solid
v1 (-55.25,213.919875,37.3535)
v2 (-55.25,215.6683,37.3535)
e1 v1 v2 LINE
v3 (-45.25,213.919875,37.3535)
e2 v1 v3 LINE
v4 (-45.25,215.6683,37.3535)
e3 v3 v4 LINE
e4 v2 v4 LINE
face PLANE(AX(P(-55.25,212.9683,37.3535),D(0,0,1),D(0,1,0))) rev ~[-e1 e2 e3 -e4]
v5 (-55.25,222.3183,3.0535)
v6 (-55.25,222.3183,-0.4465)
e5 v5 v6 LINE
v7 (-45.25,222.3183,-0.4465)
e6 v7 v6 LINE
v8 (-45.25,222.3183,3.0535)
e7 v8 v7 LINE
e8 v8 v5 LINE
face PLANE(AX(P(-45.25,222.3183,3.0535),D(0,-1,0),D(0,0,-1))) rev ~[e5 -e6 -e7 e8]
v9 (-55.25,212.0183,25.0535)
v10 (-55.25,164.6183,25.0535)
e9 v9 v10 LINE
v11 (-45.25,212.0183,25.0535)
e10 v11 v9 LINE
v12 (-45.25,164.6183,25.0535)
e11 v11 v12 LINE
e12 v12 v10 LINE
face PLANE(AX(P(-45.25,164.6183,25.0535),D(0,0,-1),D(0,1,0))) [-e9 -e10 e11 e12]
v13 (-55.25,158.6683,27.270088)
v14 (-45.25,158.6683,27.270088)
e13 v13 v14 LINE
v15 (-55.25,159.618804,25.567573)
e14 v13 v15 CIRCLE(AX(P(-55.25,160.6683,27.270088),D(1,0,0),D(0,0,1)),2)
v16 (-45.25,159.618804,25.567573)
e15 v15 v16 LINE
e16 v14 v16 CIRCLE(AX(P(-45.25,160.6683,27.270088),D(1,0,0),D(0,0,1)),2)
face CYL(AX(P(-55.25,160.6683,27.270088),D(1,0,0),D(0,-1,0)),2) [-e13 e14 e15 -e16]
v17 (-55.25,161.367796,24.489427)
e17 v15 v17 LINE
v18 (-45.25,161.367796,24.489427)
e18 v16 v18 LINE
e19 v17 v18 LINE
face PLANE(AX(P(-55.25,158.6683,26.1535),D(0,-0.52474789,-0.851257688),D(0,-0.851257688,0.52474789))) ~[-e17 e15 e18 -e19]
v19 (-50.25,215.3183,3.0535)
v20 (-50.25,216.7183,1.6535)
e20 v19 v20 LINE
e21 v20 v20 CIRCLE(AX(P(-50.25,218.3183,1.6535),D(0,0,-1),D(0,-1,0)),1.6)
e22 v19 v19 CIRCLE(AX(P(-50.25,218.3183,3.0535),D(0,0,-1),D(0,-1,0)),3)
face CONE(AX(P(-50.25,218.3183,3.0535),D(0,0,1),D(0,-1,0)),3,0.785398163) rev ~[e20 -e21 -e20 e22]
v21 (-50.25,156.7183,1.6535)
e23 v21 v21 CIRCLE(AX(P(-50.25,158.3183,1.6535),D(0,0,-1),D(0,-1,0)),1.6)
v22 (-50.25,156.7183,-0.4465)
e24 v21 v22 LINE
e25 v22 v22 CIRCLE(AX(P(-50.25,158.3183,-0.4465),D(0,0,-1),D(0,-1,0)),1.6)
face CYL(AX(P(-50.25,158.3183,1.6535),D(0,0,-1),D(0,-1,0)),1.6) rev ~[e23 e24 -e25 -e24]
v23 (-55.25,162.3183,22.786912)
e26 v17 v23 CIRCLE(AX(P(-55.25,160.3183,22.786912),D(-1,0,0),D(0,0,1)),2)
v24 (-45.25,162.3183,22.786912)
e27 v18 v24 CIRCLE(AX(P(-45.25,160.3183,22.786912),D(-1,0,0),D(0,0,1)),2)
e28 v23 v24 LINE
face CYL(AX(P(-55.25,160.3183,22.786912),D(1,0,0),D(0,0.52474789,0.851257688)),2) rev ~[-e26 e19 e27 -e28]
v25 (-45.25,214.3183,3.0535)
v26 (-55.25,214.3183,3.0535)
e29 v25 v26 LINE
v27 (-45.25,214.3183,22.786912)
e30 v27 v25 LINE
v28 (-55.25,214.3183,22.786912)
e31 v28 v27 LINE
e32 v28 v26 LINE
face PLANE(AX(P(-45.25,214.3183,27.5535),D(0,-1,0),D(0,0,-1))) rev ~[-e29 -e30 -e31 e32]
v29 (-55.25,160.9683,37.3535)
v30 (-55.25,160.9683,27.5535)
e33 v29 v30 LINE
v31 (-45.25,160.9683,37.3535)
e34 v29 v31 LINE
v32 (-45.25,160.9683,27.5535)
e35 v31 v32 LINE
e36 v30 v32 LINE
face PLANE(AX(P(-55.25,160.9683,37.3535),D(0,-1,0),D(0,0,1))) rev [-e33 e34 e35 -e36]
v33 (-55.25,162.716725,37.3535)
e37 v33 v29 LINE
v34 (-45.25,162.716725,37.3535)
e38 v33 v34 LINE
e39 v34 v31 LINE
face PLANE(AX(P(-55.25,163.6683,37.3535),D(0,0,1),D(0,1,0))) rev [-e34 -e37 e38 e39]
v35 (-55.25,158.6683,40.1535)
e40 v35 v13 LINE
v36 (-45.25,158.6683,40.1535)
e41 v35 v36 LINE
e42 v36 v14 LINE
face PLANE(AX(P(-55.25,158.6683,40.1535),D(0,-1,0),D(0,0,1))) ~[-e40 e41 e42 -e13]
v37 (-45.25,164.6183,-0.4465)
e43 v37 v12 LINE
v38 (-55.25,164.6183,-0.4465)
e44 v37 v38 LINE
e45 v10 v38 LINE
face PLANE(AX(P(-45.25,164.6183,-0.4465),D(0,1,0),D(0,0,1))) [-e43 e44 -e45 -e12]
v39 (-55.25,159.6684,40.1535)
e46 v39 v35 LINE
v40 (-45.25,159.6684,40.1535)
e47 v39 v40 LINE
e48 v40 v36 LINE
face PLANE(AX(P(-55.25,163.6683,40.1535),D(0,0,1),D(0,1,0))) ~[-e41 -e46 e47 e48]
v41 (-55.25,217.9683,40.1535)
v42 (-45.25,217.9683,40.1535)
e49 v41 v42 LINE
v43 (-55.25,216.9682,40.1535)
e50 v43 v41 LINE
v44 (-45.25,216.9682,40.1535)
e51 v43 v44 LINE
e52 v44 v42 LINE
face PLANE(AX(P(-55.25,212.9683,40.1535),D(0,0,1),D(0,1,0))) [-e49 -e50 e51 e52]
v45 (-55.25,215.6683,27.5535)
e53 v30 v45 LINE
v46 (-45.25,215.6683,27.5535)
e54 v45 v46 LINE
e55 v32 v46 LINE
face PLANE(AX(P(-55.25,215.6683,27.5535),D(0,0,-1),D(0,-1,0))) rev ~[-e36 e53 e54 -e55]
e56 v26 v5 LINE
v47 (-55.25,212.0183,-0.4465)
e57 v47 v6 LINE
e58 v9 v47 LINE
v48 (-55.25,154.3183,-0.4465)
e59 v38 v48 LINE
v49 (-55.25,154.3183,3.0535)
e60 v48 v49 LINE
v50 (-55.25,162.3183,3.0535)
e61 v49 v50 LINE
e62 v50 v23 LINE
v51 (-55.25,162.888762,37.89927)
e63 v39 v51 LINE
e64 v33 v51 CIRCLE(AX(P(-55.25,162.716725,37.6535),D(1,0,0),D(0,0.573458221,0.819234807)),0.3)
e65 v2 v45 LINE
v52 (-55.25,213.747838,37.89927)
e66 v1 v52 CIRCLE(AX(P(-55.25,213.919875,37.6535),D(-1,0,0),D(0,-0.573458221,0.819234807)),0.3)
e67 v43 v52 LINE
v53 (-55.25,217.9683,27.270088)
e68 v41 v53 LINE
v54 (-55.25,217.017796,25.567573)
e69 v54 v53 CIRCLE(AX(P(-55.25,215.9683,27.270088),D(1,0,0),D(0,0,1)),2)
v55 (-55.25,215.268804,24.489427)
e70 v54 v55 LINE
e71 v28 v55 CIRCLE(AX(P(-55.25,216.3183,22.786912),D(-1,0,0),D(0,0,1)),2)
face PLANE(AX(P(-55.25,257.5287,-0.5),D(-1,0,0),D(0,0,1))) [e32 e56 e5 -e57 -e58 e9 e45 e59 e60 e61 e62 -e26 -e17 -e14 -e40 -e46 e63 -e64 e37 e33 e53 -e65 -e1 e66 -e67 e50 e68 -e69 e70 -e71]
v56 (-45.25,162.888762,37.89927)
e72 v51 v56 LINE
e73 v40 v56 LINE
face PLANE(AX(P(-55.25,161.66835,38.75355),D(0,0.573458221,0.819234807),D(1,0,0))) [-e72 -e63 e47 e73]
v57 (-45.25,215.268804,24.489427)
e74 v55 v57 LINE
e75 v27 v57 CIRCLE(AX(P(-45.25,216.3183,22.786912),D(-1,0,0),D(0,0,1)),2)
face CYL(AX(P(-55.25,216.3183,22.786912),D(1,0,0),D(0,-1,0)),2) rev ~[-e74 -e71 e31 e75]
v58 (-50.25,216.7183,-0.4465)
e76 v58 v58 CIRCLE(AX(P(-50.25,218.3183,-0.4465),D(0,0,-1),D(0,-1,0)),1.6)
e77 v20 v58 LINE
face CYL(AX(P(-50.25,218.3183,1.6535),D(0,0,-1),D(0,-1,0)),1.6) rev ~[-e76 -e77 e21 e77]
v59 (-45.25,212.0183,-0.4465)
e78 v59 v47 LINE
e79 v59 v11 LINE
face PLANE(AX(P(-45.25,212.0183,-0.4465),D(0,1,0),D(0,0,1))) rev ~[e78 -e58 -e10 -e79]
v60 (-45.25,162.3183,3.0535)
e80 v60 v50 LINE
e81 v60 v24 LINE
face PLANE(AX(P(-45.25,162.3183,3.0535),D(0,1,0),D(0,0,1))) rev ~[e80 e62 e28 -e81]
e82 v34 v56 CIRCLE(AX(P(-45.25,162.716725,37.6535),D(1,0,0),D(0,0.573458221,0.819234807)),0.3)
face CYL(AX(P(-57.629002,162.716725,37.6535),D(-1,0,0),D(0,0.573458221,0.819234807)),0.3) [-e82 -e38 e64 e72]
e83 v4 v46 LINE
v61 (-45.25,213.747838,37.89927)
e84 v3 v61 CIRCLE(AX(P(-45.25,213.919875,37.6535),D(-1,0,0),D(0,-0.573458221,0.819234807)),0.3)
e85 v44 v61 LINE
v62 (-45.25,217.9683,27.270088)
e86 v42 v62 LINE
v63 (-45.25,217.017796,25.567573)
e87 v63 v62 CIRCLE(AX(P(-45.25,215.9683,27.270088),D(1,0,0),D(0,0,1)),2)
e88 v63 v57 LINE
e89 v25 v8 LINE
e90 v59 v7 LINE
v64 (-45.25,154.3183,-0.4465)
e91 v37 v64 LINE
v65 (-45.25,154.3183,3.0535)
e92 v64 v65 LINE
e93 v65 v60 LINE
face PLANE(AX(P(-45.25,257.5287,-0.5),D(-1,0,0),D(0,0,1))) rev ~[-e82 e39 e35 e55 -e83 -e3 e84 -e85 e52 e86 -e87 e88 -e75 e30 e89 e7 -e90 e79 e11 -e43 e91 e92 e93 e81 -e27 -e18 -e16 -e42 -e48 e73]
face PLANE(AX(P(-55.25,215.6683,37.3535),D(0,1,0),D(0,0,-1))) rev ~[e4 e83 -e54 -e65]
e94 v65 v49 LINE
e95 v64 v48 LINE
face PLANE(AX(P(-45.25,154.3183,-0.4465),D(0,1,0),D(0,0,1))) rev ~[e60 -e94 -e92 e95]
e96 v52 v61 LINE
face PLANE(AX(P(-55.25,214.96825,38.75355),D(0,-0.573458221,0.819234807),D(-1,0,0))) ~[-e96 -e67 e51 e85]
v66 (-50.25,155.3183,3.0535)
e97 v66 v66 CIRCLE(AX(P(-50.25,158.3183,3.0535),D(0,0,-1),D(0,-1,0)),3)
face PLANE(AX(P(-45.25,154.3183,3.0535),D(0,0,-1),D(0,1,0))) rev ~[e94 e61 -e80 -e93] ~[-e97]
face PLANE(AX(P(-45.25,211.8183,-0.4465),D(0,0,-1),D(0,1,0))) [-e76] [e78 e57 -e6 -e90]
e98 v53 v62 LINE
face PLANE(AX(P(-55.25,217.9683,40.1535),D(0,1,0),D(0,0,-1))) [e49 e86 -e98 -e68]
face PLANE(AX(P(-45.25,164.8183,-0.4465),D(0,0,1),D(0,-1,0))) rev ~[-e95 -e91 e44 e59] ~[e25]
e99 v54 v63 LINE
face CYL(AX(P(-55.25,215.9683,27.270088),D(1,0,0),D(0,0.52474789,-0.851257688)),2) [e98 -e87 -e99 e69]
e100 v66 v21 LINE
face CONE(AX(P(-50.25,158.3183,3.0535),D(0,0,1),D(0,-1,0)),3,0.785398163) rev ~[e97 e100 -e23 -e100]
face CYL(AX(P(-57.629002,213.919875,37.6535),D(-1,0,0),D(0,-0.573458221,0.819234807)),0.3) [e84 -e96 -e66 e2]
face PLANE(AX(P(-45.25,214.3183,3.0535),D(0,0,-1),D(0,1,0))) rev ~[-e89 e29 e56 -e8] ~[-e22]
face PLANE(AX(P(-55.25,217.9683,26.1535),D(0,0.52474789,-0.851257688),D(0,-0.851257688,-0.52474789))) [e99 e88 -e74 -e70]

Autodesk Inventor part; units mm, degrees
ref_plane "YZ Plane" through (0, 0, 0) normal (1, 0, 0) x (0, 1, 0)
ref_plane "XZ Plane" through (0, 0, 0) normal (0, 1, 0) x (-1, 0, 0)
ref_plane "Work Plane4" through (-45.25, 257.5287, -0.5) normal (1, 0, 0) x (0, -1, 0)
sketch "Sketch5" plane through (-45.25, 257.5287, -0.5) normal (1, 0, 0) x (0, -1, 0)
  line L0 (45.7104, -25.5535) -> (92.7104, -25.5535)
  line L1 (92.7104, -25.5535) -> (92.7104, -0.0535)
  line L2 (45.7104, -0.0535) -> (45.7104, -25.5535)
  line L3 (95.2104, -28.0535) -> (43.2104, -28.0535)
  line L4 (43.2104, -28.0535) -> (43.2104, -3.5535)
  line L5 (103.2104, -0.0535) -> (103.2104, -3.5535)
  line L6 (103.2104, -3.5535) -> (95.2104, -3.5535)
  line L7 (92.7104, -0.0535) -> (103.2104, -0.0535)
  line L8 (95.2104, -3.5535) -> (95.2104, -28.0535)
  line L9 (43.2104, -3.5535) -> (35.2104, -3.5535)
  line L10 (35.2104, -3.5535) -> (35.2104, -0.0535)
  line L11 (45.7104, -0.0535) -> (35.2104, -0.0535)
  point P0 (257.5287, -0.5)
  dimension "d10" = 2.5
  dimension "d11" = 3.5
  dimension "d12" = 2.5
  dimension "d13" = 8
  dimension "d14" = 2.5
  dimension "d17" = 8
  dimension "d40" = 47
  dimension "d41" = 25.5
extrude "Extrusion2" add sketch "Sketch5" against normal blind 10
sketch "Sketch6" plane through (-45.25, 154.3183, 3.0535) normal (0, 0, 1) x (1, 0, 0)
  line L0 (0, 68) -> (0, 60) projected
  line L1 (0, 68) -> (-10, 68) projected
  line L2 (-10, 60) -> (-10, 68) projected
  line L3 (0, 60) -> (-10, 60) projected
  line L4 (0, 8) -> (0, 0) projected
  line L5 (0, 8) -> (-10, 8) projected
  line L6 (-10, 0) -> (-10, 8) projected
  line L7 (0, 0) -> (-10, 0) projected
  line L8 (-10, 68) -> (0, 60) construction
  line L9 (0, 68) -> (-10, 60) construction
  line L10 (0, 8) -> (-10, 8) construction
  line L11 (-10, 8) -> (0, 0) construction
  line L12 (0, 8) -> (-10, 0) construction
  point P0 (45.25, -154.3183)
  point P1 (-5, 64)
  point P2 (-5, 4)
hole "Hole1" at (-50.25, 218.3183, 3.0535) at (-50.25, 158.3183, 3.0535) direction (0, 0, -1) diameter 3.2 end through all countersink diameter 6 countersink angle 90
sketch "Sketch7" plane through (-55.25, 257.5287, -0.5) normal (-1, 0, 0) x (0, 0, 1)
  line L0 (37.6535, -68.1104) -> (35.0535, -68.1104) projected
  line L1 (35.0535, -68.1104) -> (35.0535, -70.3104) projected
  line L2 (35.0535, -70.3104) -> (37.6535, -70.3104) projected
  line L3 (37.6535, -70.3104) -> (37.6535, -96.3604) projected
  line L4 (37.6535, -96.3604) -> (28.0535, -96.3604) projected
  line L5 (28.0535, -96.3604) -> (28.0535, -42.0604) projected
  line L6 (37.6535, -42.0604) -> (28.0535, -42.0604) construction
  line L7 (37.6535, -42.0604) -> (37.6535, -68.1104) construction
  line L8 (37.6535, -44.5604) -> (40.6535, -44.5604)
  line L9 (40.6535, -44.5604) -> (40.6535, -39.5604)
  line L10 (40.6535, -39.5604) -> (26.6535, -39.5604)
  line L11 (26.6535, -39.5604) -> (24.4035, -43.2104)
  line L12 (3.5535, -43.2104) -> (28.0535, -43.2104) projected
  line L13 (28.0535, -43.2104) -> (24.4035, -43.2104)
  line L14 (37.8535, -44.5604) -> (37.8535, -41.8604)
  line L15 (37.8535, -41.8604) -> (28.0535, -41.8604)
  line L16 (28.0535, -41.8604) -> (28.0535, -42.0604)
  point P0 (0.5, -257.5287)
  dimension "d42" = 2.5
  dimension "d43" = 3
  dimension "d44" = 5
  dimension "d45" = 3.65
  dimension "d46" = 14
  dimension "d47" = 9.6
  dimension "d48" = 3.65
  dimension "d49" = 0.2
  dimension "d50" = 0.2
extrude "Extrusion3" add sketch "Sketch7" against normal blind 10
chamfer "Chamfer1" distance 4 distance2 2.8 1 edges at (-50.25, 212.9683, 40.1535) measured on face at (-51.9167, 214.6349, 40.1535)
fillet "Fillet2" radius 0.3 2 edges at (-50.25, 212.9683, 37.3536) (-50.25, 212.9683, 37.3535)
ref_plane "Work Plane5" through (-45.25, 188.3183, 3.0535) normal (0, -1, 0) x (1, 0, 0)
mirror "Mirror2" about plane through (-45.25, 188.3183, 3.0535) normal (0, -1, 0) of "Extrusion3", "Fillet2", "Chamfer1"
sketch "Sketch8" plane through (-45.25, 257.5287, -0.5) normal (1, 0, 0) x (0, 0, -1)
  line L0 (-25.5535, -45.7104) -> (-0.0535, -45.7104) projected
  line L1 (-25.5535, -45.7104) -> (-0.0535, -45.7104)
  line L2 (-0.0535, -45.7104) -> (-0.0535, -45.5104)
  line L3 (-0.0535, -45.5104) -> (-25.5535, -45.5104)
  line L4 (-25.5535, -45.5104) -> (-25.5535, -45.7104)
  line L5 (-0.0535, -92.7104) -> (-25.5535, -92.7104) projected
  line L6 (-25.5535, -92.7104) -> (-0.0535, -92.7104)
  line L7 (-0.0535, -92.7104) -> (-0.0535, -92.9104)
  line L8 (-0.0535, -92.9104) -> (-25.5535, -92.9104)
  line L9 (-25.5535, -92.9104) -> (-25.5535, -92.7104)
  point P0 (-0.5, -257.5287)
  dimension "d51" = 0.2
  dimension "d52" = 0.2
extrude "Extrusion4" cut sketch "Sketch8" against normal through all
fillet "Fillet3" radius 2 4 edges at (-50.25, 217.9683, 26.1535) (-50.25, 214.3183, 23.9035) (-50.25, 158.6683, 26.1535) (-50.25, 162.3183, 23.9035)
equation "\"d12\" = d10"
equation "\"d14\" = d10"
equation "\"d17\" = d13"
equation "\"d45\" = d48"
properties part number "batteryHolder"
